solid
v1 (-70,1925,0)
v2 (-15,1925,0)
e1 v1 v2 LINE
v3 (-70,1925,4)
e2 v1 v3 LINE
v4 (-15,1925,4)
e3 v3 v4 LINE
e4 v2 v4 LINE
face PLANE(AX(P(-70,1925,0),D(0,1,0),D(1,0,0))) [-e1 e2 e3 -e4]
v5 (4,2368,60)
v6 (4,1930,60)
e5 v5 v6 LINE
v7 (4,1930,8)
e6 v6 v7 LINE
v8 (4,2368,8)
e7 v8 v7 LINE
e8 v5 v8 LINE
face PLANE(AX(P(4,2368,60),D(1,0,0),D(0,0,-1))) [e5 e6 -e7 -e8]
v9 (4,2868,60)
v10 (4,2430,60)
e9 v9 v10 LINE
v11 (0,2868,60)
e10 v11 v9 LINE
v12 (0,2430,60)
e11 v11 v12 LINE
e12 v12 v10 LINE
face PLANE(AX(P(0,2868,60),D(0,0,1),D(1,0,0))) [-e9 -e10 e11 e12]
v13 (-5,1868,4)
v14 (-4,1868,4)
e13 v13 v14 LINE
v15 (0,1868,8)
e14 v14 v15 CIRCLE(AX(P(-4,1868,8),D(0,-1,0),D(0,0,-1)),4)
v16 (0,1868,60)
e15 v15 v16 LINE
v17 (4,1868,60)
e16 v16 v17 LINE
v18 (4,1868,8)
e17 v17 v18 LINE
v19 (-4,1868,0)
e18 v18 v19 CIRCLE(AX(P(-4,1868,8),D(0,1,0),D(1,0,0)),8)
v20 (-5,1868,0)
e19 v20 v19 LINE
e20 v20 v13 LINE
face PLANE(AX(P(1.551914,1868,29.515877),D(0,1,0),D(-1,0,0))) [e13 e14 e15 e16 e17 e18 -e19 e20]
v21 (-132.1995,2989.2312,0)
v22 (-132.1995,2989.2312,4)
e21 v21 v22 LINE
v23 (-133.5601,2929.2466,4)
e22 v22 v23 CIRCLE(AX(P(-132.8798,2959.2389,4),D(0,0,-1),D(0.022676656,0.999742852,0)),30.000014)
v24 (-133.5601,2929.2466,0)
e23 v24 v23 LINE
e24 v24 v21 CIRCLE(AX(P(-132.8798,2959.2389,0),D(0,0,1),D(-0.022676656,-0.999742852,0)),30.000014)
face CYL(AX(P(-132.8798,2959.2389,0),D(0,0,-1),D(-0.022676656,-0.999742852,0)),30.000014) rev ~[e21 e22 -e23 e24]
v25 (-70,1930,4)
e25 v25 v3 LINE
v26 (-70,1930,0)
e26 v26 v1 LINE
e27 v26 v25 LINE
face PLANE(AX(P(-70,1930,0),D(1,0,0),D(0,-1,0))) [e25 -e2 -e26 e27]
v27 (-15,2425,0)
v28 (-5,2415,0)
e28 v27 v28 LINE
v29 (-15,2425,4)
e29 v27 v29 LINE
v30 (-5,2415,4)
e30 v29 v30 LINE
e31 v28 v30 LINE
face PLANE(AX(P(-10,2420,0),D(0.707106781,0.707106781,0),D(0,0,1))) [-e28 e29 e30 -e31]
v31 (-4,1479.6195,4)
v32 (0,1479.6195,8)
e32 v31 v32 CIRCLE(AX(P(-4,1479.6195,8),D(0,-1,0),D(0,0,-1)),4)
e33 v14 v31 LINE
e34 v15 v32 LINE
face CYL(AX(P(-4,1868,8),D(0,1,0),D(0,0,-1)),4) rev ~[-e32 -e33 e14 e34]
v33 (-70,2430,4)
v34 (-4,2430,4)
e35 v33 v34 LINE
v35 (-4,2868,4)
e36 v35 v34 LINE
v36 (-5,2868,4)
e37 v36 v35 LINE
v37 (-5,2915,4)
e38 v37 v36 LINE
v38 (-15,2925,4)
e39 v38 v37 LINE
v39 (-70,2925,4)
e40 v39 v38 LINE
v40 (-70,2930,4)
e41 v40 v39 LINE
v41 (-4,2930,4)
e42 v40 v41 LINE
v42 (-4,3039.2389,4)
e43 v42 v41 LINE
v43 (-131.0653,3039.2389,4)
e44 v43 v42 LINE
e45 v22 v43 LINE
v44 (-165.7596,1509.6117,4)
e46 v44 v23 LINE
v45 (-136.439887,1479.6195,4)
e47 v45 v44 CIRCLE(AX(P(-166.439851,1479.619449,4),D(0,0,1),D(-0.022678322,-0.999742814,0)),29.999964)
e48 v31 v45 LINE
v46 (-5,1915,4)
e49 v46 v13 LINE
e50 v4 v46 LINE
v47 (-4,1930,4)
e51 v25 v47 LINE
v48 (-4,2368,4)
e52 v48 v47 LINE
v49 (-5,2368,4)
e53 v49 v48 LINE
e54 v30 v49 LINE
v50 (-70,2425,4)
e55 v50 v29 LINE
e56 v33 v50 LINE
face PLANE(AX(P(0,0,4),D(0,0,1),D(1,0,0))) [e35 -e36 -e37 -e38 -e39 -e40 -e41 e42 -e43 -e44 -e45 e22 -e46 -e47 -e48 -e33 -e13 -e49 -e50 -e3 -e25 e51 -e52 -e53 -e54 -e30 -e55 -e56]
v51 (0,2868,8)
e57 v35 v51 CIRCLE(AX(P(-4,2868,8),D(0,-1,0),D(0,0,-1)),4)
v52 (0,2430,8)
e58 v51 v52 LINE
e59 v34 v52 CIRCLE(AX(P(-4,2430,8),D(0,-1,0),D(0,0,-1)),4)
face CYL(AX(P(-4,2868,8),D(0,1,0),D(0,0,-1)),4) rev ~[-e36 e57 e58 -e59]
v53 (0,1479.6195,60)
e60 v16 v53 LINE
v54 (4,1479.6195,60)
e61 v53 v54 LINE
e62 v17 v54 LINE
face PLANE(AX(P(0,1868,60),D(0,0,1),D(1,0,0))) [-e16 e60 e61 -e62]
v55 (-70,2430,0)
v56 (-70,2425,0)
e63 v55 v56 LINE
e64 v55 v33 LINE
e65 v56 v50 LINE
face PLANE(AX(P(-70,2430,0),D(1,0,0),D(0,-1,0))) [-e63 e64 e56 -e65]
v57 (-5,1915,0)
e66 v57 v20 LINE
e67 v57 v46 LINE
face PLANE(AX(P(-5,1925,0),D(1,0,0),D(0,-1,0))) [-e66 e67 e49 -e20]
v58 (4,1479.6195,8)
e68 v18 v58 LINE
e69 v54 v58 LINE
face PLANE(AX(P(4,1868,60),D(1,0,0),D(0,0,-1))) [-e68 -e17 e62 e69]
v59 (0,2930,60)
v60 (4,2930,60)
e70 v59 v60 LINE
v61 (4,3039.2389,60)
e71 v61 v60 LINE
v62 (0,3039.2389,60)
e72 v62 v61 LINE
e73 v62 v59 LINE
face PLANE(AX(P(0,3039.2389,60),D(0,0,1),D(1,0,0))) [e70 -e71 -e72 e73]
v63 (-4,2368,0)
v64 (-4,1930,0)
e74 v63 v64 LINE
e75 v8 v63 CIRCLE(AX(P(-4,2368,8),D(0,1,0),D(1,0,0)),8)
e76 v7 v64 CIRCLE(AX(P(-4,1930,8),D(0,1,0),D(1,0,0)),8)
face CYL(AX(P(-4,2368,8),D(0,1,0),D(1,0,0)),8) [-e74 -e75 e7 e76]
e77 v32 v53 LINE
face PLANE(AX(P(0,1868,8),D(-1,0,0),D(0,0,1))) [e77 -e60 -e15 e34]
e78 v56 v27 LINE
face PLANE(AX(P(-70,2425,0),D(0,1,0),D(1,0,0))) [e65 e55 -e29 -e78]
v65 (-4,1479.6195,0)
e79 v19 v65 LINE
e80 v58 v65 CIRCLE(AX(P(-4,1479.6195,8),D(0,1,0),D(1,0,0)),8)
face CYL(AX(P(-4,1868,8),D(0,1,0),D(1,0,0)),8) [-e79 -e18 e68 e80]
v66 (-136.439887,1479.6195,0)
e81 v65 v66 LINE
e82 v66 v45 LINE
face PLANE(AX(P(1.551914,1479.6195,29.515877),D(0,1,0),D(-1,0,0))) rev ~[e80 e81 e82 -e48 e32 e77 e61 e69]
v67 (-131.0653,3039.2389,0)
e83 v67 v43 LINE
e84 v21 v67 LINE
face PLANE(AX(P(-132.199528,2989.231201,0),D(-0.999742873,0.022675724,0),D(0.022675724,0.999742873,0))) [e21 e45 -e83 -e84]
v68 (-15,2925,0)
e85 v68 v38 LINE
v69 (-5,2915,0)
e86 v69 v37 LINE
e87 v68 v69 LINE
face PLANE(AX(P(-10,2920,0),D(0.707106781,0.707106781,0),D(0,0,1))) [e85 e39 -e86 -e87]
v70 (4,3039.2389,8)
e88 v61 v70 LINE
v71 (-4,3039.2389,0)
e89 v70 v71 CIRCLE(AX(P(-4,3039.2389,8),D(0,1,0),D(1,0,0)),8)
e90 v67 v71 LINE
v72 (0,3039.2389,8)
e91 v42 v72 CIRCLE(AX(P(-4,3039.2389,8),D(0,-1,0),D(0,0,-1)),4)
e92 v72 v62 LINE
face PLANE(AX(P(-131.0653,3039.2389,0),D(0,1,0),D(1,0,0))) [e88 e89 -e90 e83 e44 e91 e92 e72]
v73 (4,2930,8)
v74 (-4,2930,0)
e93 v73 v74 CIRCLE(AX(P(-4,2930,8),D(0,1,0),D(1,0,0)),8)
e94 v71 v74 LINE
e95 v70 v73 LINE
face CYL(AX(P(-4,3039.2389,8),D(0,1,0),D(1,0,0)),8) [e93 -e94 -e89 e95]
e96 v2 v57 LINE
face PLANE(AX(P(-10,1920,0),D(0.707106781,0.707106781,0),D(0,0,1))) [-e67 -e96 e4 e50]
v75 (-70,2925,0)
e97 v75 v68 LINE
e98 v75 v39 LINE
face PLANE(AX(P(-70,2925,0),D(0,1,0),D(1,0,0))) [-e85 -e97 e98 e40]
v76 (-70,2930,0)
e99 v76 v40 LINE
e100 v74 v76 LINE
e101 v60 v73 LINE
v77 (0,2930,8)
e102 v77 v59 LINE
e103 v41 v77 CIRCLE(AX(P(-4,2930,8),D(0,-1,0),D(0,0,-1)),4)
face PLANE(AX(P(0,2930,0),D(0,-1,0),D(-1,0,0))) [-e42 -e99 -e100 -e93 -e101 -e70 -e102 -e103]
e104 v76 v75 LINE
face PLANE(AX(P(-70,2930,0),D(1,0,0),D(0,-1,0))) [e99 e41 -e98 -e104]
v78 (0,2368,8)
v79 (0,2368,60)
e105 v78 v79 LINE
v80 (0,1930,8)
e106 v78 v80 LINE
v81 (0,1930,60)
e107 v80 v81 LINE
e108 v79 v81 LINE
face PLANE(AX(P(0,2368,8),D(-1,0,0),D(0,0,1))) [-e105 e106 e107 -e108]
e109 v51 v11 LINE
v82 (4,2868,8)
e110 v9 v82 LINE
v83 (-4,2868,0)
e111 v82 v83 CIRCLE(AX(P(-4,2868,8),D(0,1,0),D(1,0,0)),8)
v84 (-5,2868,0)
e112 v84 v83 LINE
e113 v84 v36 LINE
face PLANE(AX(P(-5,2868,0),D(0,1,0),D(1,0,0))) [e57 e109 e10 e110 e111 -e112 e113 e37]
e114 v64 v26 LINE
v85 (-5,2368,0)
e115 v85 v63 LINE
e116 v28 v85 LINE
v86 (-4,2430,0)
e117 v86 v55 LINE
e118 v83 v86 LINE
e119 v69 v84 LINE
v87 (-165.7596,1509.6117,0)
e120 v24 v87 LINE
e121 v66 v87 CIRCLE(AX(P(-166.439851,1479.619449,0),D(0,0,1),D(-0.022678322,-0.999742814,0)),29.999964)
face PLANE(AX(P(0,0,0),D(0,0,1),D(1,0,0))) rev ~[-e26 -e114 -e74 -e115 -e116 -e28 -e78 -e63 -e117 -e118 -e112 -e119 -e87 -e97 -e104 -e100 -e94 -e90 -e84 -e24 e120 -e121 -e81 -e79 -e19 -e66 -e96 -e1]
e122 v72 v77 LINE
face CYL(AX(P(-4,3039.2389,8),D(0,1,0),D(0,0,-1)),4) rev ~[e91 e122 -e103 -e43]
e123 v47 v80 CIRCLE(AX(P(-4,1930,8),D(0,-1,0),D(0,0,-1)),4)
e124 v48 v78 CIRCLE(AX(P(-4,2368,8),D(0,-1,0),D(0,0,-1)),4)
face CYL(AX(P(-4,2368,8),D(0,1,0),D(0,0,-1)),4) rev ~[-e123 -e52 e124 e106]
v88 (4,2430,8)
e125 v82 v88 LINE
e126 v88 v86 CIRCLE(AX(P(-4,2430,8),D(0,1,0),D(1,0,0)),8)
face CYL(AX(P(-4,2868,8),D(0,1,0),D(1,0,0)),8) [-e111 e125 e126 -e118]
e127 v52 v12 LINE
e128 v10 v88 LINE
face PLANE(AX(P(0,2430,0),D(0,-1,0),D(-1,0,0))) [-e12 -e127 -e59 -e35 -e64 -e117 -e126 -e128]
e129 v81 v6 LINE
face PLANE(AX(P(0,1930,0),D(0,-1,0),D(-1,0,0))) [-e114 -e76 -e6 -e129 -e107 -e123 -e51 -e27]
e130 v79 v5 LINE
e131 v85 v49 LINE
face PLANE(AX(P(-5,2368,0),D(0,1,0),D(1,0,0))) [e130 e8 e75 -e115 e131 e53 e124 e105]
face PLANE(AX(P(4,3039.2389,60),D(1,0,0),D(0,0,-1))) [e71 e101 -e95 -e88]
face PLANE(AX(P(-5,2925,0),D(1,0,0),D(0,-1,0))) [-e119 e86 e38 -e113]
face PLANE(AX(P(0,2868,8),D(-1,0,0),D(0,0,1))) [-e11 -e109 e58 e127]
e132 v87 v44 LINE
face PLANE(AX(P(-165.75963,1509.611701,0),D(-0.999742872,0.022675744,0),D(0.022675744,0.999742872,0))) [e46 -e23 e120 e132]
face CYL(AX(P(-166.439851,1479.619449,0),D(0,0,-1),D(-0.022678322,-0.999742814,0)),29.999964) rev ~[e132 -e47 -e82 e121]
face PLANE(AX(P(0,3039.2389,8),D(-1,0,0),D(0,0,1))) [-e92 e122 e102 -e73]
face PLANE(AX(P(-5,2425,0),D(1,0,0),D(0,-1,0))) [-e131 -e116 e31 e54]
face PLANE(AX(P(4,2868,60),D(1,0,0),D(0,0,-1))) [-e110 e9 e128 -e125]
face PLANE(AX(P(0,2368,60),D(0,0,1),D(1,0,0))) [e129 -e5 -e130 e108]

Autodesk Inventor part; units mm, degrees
ref_plane "YZ Plane" through (0, 0, 0) normal (1, 0, 0) x (0, 1, 0)
ref_plane "XZ Plane" through (0, 0, 0) normal (0, 1, 0) x (-1, 0, 0)
ref_plane "XY Plane" through (0, 0, 0) normal (0, 0, 1) x (1, 0, 0)
sketch "Sketch1" plane through (0, 0, 0) normal (0, 0, 1) x (1, 0, 0)
  line L0 (0, 0) -> (0, 1479.6195)
  line L1 (0, 1479.6195) -> (-166.4399, 1479.6195)
  line L2 (-166.4399, 1479.6195) -> (-200, 0)
  line L3 (-200, 0) -> (0, 0)
  line L4 (0, 430) -> (-5, 430)
  line L5 (-5, 430) -> (-5, 368)
  line L6 (-5, 368) -> (0, 368)
  line L7 (0, 368) -> (0, 430)
  line L8 (-5, 430) -> (-70, 430)
  line L9 (-70, 430) -> (-70, 425)
  line L10 (-70, 425) -> (-5, 425)
  line L11 (-5, 425) -> (-5, 430)
  line L12 (-70, 430) -> (-190.2469, 430) construction
  line L13 (0, 4408.8661) -> (0, 1479.6195)
  line L14 (-166.4399, 1479.6195) -> (-132.8798, 2959.2389)
  line L15 (0, 4408.8661) -> (-100, 4408.8661)
  line L16 (-132.8798, 2959.2389) -> (0, 2959.2389)
  line L17 (-132.8798, 2959.2389) -> (-100, 4408.8661)
  line L18 (-5, 868) -> (0, 868)
  line L19 (-70, 925) -> (-5, 925)
  line L20 (-5, 930) -> (-70, 930)
  line L21 (-70, 930) -> (-70, 925)
  line L22 (-5, 925) -> (-5, 930)
  line L23 (-5, 930) -> (-5, 868)
  line L24 (0, 868) -> (0, 930)
  line L25 (0, 930) -> (-5, 930)
  line L26 (-5, 1368) -> (0, 1368)
  line L27 (-70, 1425) -> (-5, 1425)
  line L28 (-5, 1430) -> (-70, 1430)
  line L29 (-70, 1430) -> (-70, 1425)
  line L30 (-5, 1425) -> (-5, 1430)
  line L31 (-5, 1430) -> (-5, 1368)
  line L32 (0, 1368) -> (0, 1430)
  line L33 (0, 1430) -> (-5, 1430)
  line L34 (-5, 1868) -> (0, 1868)
  line L35 (-70, 1925) -> (-5, 1925)
  line L36 (-5, 1930) -> (-70, 1930)
  line L37 (-70, 1930) -> (-70, 1925)
  line L38 (-5, 1925) -> (-5, 1930)
  line L39 (-5, 1930) -> (-5, 1868)
  line L40 (0, 1868) -> (0, 1930)
  line L41 (0, 1930) -> (-5, 1930)
  line L42 (-5, 2368) -> (0, 2368)
  line L43 (-70, 2425) -> (-5, 2425)
  line L44 (-5, 2430) -> (-70, 2430)
  line L45 (-70, 2430) -> (-70, 2425)
  line L46 (-5, 2425) -> (-5, 2430)
  line L47 (-5, 2430) -> (-5, 2368)
  line L48 (0, 2368) -> (0, 2430)
  line L49 (0, 2430) -> (-5, 2430)
  line L50 (-5, 2868) -> (0, 2868)
  line L51 (-70, 2925) -> (-5, 2925)
  line L52 (-5, 2930) -> (-70, 2930)
  line L53 (-70, 2930) -> (-70, 2925)
  line L54 (-5, 2925) -> (-5, 2930)
  line L55 (-5, 2930) -> (-5, 2868)
  line L56 (0, 2868) -> (0, 2930)
  line L57 (0, 2930) -> (-5, 2930)
  line L58 (-100, 4408.8661) -> (-99.3197, 4438.8584) construction
  line L59 (0, 1629.6195) -> (-163.0377, 1629.6195)
  line L60 (-131.0653, 3039.2389) -> (0, 3039.2389)
  line L61 (-5, 3368) -> (0, 3368)
  line L62 (-70, 3425) -> (-5, 3425)
  line L63 (-5, 3430) -> (-70, 3430)
  line L64 (-70, 3430) -> (-70, 3425)
  line L65 (-5, 3425) -> (-5, 3430)
  line L66 (-5, 3430) -> (-5, 3368)
  line L67 (0, 3368) -> (0, 3430)
  line L68 (0, 3430) -> (-5, 3430)
  line L69 (-5, 3868) -> (0, 3868)
  line L70 (-70, 3925) -> (-5, 3925)
  line L71 (-5, 3930) -> (-70, 3930)
  line L72 (-70, 3930) -> (-70, 3925)
  line L73 (-5, 3925) -> (-5, 3930)
  line L74 (-5, 3930) -> (-5, 3868)
  line L75 (0, 3868) -> (0, 3930)
  line L76 (0, 3930) -> (-5, 3930)
  arc A0 (-140, 0) -> (-198.6395, 59.9846) centre (-200, 0) ccw
  arc A1 (-167.1202, 1449.6272) -> (-165.7596, 1509.6117) centre (-166.4399, 1479.6195) ccw
  arc A2 (-133.5601, 2929.2466) -> (-132.1995, 2989.2312) centre (-132.8798, 2959.2389) ccw
  line L77 (0, 930) -> (-70, 930)
  line L78 (-70, 930) -> (-178.9061, 930) construction
  line L79 (-70, 1430) -> (-167.5654, 1430) construction
  line L80 (-70, 1930) -> (-156.2246, 1930) construction
  line L81 (-70, 2430) -> (-144.8838, 2430) construction
  line L82 (-70, 2930) -> (-133.543, 2930) construction
  line L83 (-70, 3430) -> (-122.2022, 3430) construction
  line L84 (-70, 3930) -> (-110.8614, 3930) construction
  point P0 (0, 430)
  point P1 (-136.4399, 1479.6195)
  dimension "d25" = 430
  dimension "d32" = 1480
  dimension "d33" = 1480
  dimension "d34" = 1450
  dimension "d35" = 100
  dimension "d38" = 500
  dimension "d44" = 30
  dimension "d45" = 150
  dimension "d46" = 80
  dimension "d47" = 200
  dimension "d48" = 5
  dimension "d50" = 62
  dimension "d51" = 60
  dimension "d52" = 30
  dimension "d53" = 478.8661
  dimension "d54" = 30
  dimension "d56" = 190.2469
  dimension "d57" = 178.9061
  dimension "d58" = 167.5654
  dimension "d59" = 156.2246
  dimension "d60" = 144.8838
  dimension "d61" = 133.543
  dimension "d62" = 122.2022
  dimension "d63" = 110.8614
  dimension "d64" = 70
extrude "Plate1" add sketch "Sketch1" along normal blind 4 contours A1 L14 L59 L13 L1 | L14 A2 L16 L13 L57 L52 L53 L51 L55 L50 L49 L44 L45 L43 L47 L42 L41 L36 L37 L35 L39 L34 L59 | A2 L17 L60 L13 L16
sketch "Sketch2" plane through (4, 1479.6195, 0) normal (-1, 0, 0) x (0, -1, 0)
  line L0 (-388.3805, 0) -> (0, 0)
  line L1 (0, 0) -> (0, -60)
  line L2 (0, -60) -> (-388.3805, -60)
  line L3 (-388.3805, -60) -> (-388.3805, 0)
edge flange "Flange1" height 60 angle 90 thickness 4 bend radius 4 thickness toward (-1, 0, 0) relief tear relief width 4 relief depth 2 corner gap 4 corner form 0 edges at (0, 1673.8097, 0) (0, 2149, 0) (0, 2649, 0) (0, 2984.6195, 0) wall of the first edge with corners at (4, 1868, 0) (4, 1479.6195, 0) (4, 1479.6195, 60) (4, 1868, 60)
bend "Bend1"
corner "Corner1"
chamfer "Corner Chamfer1" distance 10 angle 45 3 edges at (-5, 1925, 2) (-5, 2425, 2) (-5, 2925, 2)
equation "\"d5\" = Thickness"
equation "\"d7\" = BendReliefWidth"
equation "\"d8\" = BendReliefDepth"
equation "\"d9\" = MinimumRemnant"
equation "\"d10\" = TransitionRadius"
equation "\"d13\" = BendRadius"
equation "\"d14\" = CornerReliefSize"
equation "\"d15\" = GapSize"
equation "\"d16\" = JacobiRadiusSize"
equation "\"BendRadius\" = Thickness"
equation "\"BendReliefWidth\" = Thickness"
equation "\"BendReliefDepth\" = 0.5 * Thickness"
equation "\"CornerReliefSize\" = 4 * Thickness"
equation "\"MinimumRemnant\" = 2 * Thickness"
equation "\"TransitionRadius\" = BendRadius"
equation "\"JacobiRadiusSize\" = BendRadius"
equation "\"GapSize\" = Thickness"
equation "\"Thickness\" = 4"
properties part number "04.2 GBK rib" material "Steel"
